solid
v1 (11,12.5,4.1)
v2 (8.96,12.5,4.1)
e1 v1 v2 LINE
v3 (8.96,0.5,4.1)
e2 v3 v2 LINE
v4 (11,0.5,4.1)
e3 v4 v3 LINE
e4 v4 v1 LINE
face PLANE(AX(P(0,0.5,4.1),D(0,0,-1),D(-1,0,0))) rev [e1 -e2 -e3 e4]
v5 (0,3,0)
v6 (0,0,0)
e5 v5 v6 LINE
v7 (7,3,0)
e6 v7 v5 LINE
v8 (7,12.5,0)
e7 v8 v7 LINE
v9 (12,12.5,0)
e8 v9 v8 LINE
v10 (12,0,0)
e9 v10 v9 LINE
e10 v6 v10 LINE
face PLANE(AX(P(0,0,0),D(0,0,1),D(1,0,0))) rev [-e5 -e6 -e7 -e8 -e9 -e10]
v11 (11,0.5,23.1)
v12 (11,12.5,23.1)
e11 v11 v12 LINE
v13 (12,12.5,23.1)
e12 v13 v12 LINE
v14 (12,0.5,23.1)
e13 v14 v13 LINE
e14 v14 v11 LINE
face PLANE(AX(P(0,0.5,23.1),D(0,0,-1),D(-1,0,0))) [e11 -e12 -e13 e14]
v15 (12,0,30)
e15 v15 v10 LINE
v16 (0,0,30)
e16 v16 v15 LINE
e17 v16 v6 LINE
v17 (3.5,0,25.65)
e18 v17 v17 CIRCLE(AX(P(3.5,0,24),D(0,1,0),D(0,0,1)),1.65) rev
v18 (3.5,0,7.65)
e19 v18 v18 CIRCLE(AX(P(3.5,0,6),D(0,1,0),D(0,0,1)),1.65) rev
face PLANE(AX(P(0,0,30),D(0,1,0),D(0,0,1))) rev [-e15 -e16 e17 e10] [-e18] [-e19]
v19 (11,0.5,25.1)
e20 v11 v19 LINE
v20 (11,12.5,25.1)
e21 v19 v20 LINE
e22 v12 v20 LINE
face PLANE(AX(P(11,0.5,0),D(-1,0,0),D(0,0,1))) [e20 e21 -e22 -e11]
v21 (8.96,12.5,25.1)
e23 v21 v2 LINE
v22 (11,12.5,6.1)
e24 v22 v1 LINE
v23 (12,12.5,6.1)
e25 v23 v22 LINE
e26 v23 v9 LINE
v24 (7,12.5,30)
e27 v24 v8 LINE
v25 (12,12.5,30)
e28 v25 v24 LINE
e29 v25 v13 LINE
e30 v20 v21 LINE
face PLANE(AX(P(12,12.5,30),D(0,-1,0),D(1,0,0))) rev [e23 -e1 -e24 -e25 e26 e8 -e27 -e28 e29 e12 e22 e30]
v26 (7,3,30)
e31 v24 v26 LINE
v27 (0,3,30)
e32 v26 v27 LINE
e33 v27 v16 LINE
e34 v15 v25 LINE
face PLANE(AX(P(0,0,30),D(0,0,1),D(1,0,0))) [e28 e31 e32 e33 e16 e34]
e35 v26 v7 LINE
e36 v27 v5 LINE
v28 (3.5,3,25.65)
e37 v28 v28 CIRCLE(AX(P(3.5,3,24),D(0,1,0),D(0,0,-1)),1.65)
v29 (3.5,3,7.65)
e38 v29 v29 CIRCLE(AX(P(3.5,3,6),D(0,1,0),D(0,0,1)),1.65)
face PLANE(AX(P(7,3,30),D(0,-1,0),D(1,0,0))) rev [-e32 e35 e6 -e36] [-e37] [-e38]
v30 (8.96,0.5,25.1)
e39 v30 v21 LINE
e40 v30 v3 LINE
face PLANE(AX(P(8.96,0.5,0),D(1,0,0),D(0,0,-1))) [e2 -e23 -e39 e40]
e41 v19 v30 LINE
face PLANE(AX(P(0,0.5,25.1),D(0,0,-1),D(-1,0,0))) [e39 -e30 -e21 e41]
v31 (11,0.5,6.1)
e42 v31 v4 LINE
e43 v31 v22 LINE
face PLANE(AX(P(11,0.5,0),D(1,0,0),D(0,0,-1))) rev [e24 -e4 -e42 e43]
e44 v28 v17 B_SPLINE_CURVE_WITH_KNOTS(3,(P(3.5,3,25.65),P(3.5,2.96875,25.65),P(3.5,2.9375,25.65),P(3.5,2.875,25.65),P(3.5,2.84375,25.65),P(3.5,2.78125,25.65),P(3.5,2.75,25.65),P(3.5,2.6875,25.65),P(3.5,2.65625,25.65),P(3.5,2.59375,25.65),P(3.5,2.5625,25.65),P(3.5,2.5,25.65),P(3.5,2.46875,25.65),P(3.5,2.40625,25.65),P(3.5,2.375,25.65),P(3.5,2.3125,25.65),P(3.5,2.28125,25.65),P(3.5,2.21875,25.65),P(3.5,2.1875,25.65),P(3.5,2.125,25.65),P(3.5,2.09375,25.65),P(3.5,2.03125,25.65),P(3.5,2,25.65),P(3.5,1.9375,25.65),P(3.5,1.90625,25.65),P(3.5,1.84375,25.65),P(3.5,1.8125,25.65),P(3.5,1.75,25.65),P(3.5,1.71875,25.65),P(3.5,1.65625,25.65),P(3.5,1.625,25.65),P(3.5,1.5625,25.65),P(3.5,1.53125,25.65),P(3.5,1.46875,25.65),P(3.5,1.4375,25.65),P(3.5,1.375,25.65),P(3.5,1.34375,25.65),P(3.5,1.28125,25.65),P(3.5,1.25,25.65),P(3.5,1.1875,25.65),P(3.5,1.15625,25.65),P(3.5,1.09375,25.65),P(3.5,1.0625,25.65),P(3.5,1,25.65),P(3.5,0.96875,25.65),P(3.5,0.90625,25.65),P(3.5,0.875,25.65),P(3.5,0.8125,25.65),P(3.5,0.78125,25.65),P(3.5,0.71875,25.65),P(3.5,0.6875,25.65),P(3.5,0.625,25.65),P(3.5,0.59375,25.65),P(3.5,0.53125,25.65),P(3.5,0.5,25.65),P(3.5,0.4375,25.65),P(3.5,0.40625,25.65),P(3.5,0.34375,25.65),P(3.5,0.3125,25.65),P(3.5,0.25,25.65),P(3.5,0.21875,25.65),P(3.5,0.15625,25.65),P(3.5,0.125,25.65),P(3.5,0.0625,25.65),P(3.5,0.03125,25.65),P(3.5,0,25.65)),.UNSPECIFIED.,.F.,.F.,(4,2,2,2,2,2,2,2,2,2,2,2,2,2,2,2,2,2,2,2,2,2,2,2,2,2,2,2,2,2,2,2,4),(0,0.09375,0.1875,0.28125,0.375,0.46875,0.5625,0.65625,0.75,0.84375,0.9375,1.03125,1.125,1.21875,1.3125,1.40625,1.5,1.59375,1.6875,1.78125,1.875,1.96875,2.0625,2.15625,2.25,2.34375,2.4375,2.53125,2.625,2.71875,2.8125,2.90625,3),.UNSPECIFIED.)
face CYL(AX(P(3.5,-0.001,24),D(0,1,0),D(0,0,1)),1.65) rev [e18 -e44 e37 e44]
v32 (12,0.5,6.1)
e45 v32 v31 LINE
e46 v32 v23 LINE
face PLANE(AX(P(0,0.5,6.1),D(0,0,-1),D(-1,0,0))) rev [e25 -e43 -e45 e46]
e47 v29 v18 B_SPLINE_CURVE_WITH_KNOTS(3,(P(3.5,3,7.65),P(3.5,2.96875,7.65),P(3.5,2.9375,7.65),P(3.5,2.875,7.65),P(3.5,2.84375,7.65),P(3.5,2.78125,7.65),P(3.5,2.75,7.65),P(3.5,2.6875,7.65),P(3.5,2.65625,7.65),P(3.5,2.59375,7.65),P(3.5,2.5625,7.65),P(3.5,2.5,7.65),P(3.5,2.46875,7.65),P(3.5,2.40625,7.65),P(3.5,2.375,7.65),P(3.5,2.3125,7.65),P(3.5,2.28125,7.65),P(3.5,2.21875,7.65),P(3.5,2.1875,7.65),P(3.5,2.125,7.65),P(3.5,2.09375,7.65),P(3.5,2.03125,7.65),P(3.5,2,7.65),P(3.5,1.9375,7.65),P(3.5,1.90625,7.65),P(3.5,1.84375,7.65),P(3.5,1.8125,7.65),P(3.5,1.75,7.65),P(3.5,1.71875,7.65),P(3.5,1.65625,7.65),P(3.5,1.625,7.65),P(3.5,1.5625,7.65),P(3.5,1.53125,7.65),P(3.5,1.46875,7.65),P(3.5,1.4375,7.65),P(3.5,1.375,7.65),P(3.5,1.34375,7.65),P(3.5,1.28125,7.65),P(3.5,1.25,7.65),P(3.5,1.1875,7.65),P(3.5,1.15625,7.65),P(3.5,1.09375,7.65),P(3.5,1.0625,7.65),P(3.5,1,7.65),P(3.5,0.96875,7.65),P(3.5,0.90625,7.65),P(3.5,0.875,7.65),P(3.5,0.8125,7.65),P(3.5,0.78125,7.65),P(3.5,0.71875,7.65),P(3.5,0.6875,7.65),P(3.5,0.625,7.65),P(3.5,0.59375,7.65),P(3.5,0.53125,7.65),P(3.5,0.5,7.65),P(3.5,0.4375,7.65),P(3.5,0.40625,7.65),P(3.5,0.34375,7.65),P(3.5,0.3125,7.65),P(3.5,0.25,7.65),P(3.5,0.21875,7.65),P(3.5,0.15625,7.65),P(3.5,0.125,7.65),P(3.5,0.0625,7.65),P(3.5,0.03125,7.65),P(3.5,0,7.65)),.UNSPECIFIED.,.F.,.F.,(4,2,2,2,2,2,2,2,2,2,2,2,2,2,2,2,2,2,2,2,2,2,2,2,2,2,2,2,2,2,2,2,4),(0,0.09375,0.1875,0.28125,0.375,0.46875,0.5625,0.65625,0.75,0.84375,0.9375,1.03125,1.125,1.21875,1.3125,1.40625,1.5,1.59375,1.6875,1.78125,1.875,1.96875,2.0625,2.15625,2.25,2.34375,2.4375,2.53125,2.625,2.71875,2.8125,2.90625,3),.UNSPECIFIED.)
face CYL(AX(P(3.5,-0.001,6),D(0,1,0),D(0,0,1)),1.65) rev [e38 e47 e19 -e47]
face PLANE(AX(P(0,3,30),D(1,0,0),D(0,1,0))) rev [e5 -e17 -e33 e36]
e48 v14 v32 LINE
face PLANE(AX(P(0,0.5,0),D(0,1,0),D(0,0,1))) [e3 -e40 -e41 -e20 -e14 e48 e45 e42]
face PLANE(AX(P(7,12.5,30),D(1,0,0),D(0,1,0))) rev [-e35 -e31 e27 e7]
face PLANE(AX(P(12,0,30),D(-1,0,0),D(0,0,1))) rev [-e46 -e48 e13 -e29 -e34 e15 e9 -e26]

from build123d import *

# Parameters (mm, degrees)
SALIENTE_EXTRUIR1_DEPTH = 30
CORTAR_EXTRUIR1_DEPTH   = 12
CORTAR_EXTRUIR2_REACH   = 35.679
CROQUIS3_R              = 1.65


with BuildPart() as part:
    # Croquis1 → Saliente-Extruir1 (new body)
    with BuildSketch(Plane.XY):
        Polygon((12, 0), (12, 12.5), (7, 12.5), (7, 3), (0, 3), (0, 0), align=None)
    extrude(amount=SALIENTE_EXTRUIR1_DEPTH)

    # Croquis2 → Cortar-Extruir1 (cut)
    with BuildSketch(Plane(origin=(0, 12.5, 0), x_dir=(1, 0, 0), z_dir=(0, 1, 0))):
        Polygon((12, -23.1), (12, -15), (12, -6.1), (11, -6.1), (11, -4.1), (8.96, -4.1), (8.96, -25.1), (11, -25.1), (11, -23.1), align=None)
    extrude(amount=-CORTAR_EXTRUIR1_DEPTH, mode=Mode.SUBTRACT)

    # Croquis3 → Cortar-Extruir2 (cut, up to next)
    with BuildSketch(Plane(origin=(0, 3, 0), x_dir=(1, 0, 0), z_dir=(0, 1, 0)), mode=Mode.PRIVATE) as cortar_extruir2_sk1:
        with Locations((3.5, -6)):
            Circle(CROQUIS3_R)
    cortar_extruir2_tool1 = extrude(cortar_extruir2_sk1.sketch, amount=-CORTAR_EXTRUIR2_REACH, mode=Mode.PRIVATE) & part.part
    # Croquis3 → Cortar-Extruir2 (cut, up to next)
    with BuildSketch(Plane(origin=(0, 3, 0), x_dir=(1, 0, 0), z_dir=(0, 1, 0)), mode=Mode.PRIVATE) as cortar_extruir2_sk2:
        with Locations((3.5, -24)):
            Circle(CROQUIS3_R)
    cortar_extruir2_tool2 = extrude(cortar_extruir2_sk2.sketch, amount=-CORTAR_EXTRUIR2_REACH, mode=Mode.PRIVATE) & part.part
    add(cortar_extruir2_tool1.solids().sort_by_distance((3.5, 3, 6))[0], mode=Mode.SUBTRACT)
    add(cortar_extruir2_tool2.solids().sort_by_distance((3.5, 3, 24))[0], mode=Mode.SUBTRACT)


solid = part.part
